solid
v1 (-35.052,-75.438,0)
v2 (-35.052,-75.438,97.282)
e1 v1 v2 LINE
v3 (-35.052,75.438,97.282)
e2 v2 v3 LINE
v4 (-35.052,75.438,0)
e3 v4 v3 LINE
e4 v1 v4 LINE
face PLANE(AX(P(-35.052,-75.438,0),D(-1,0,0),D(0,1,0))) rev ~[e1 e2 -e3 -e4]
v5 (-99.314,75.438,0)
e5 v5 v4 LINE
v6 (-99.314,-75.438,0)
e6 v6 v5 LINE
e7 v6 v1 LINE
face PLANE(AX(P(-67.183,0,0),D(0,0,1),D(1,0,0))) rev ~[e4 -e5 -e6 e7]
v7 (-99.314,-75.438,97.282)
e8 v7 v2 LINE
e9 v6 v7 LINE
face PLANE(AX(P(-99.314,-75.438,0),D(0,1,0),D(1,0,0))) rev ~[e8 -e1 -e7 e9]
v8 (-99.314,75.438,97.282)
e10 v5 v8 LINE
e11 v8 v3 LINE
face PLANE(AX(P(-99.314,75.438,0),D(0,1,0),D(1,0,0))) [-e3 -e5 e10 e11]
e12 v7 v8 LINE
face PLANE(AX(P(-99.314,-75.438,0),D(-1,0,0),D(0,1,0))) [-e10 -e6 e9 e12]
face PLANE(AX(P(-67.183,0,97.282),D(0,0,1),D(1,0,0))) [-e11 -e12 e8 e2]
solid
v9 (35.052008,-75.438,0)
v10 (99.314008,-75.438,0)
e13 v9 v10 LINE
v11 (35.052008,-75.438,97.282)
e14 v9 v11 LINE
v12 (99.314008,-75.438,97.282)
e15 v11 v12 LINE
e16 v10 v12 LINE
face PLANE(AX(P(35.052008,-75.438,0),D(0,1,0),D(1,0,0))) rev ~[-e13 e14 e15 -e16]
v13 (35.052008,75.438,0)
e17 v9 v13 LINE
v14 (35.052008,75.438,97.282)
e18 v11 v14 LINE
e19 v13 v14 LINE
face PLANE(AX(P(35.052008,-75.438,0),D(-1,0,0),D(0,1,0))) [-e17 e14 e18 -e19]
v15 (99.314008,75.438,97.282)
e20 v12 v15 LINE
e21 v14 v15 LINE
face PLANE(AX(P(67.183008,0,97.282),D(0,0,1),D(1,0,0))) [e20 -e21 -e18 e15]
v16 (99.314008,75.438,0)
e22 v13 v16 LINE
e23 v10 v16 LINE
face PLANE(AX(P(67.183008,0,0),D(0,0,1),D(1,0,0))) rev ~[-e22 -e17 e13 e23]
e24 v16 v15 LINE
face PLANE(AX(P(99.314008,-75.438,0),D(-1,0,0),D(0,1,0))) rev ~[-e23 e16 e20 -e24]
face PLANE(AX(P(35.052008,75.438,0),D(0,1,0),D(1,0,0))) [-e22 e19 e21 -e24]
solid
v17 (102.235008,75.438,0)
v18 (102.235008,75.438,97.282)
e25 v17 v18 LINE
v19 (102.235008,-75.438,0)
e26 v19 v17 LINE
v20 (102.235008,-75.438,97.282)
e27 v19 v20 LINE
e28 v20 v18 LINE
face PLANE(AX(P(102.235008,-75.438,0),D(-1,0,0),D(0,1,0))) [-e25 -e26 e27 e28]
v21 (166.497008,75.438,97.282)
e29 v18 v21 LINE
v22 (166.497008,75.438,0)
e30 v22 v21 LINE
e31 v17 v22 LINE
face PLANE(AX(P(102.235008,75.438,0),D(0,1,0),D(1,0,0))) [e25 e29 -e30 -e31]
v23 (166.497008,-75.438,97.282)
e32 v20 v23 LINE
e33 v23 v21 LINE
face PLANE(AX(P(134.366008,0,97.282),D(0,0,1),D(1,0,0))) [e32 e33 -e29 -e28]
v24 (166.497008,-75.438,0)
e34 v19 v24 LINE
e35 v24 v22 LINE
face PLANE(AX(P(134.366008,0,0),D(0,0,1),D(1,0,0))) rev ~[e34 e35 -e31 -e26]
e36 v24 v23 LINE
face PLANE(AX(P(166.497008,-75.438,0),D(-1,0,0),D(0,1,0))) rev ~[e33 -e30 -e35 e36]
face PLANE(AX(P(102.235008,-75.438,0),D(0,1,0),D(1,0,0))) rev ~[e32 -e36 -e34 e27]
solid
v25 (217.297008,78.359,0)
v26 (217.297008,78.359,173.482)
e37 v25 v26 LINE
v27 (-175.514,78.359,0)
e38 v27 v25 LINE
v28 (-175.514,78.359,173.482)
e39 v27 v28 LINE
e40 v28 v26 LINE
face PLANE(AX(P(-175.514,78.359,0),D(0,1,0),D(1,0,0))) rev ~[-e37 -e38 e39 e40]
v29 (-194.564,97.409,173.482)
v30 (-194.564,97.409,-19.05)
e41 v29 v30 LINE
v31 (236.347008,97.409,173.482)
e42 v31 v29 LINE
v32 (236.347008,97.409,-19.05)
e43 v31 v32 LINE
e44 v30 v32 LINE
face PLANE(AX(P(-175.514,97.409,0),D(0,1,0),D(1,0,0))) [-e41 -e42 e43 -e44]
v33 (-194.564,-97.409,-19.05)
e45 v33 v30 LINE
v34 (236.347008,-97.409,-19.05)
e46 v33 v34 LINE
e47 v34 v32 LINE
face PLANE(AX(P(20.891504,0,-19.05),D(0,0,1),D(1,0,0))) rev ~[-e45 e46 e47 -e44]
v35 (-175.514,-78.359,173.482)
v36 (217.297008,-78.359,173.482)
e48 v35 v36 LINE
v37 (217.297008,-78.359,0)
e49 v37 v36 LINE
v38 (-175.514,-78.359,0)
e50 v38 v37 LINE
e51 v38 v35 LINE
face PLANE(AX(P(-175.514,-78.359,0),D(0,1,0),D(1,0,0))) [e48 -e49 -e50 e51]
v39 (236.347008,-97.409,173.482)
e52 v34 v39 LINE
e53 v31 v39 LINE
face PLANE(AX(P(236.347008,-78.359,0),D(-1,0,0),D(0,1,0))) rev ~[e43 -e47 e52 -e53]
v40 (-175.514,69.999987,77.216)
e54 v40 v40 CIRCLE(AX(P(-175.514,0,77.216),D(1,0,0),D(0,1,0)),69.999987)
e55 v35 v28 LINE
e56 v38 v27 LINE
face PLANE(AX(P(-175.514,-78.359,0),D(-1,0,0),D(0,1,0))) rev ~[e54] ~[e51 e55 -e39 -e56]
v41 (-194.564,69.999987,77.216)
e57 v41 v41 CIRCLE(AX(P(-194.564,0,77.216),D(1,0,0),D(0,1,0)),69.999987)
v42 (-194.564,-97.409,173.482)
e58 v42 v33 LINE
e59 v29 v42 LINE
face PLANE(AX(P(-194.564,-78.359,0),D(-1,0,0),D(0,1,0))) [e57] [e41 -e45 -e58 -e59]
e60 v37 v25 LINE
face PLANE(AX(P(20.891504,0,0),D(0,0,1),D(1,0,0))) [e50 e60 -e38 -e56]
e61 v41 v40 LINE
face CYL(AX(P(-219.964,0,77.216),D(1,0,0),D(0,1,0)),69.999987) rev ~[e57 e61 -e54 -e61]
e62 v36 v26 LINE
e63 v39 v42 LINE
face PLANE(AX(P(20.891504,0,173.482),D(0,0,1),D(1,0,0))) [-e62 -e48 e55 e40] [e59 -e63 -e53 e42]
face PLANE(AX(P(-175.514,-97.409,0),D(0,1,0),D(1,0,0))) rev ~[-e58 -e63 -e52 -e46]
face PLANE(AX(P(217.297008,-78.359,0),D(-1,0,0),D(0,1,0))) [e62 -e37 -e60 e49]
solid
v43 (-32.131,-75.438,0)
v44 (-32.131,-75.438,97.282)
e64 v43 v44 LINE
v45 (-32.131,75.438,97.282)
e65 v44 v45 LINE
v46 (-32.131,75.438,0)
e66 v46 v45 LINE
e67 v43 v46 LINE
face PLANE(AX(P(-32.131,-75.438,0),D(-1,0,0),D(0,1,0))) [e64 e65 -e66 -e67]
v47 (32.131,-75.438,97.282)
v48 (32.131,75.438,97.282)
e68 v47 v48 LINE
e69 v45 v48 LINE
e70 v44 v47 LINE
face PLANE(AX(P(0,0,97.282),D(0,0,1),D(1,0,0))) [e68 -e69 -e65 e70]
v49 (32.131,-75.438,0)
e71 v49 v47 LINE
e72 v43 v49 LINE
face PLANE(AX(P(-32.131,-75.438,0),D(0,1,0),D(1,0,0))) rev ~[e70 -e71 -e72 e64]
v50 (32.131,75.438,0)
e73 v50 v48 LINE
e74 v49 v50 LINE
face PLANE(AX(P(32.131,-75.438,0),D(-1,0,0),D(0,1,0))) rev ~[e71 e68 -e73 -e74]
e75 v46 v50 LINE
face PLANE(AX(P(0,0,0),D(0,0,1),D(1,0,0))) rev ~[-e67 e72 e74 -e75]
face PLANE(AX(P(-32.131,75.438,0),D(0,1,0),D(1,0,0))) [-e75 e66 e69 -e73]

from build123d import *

# Parameters (mm, degrees)
F0_W      = 64.262
F0_H      = 150.876
F1_DEPTH  = 97.282
F2_W      = 64.262
F2_H      = 150.876
F3_DEPTH  = 97.282
F4_W      = 64.262
F4_H      = 150.876
F5_DEPTH  = 97.282
F6_W      = 64.262
F6_H      = 150.876
F7_DEPTH  = 97.282
F8_W      = 392.8110076251
F8_H      = 156.718
F9_DEPTH  = 173.482
F10_T     = 19.05
F12_D     = 139.999974
F12_DEPTH = 25.4
F12_TIP   = 42.0602355207


with BuildPart() as f1:
    # F0 (on Top) → F1 (new body)
    with BuildSketch(Plane.XY):
        Rectangle(F0_W, F0_H)
    extrude(amount=F1_DEPTH)


with BuildPart() as f3:
    # F2 (on Top) → F3 (new body)
    with BuildSketch(Plane.XY):
        with Locations((-67.183, 0)):
            Rectangle(F2_W, F2_H)
    extrude(amount=F3_DEPTH)


with BuildPart() as f5:
    # F4 (on Top) → F5 (new body)
    with BuildSketch(Plane.XY):
        with Locations((67.1830076251, 0)):
            Rectangle(F4_W, F4_H)
    extrude(amount=F5_DEPTH)


with BuildPart() as f7:
    # F6 (on Top) → F7 (new body)
    with BuildSketch(Plane.XY):
        with Locations((134.3660076251, 0)):
            Rectangle(F6_W, F6_H)
    extrude(amount=F7_DEPTH)


with BuildPart() as f9:
    # F8 (on Top) → F9 (new body)
    with BuildSketch(Plane.XY):
        with Locations((20.8915038126, 0)):
            Rectangle(F8_W, F8_H)
    extrude(amount=F9_DEPTH)

    # F10
    f10_openings = [f9.faces().sort_by_distance(p)[0] for p in [
        (20.891504, 0, 173.482),
    ]]
    offset(amount=F10_T, openings=f10_openings, kind=Kind.INTERSECTION)

    # F12
    with Locations(Plane(origin=(-194.564, 0, 0), x_dir=(0, -1, 0), z_dir=(-1, 0, 0))):
        with Locations((0, 77.216)):
            Hole(F12_D / 2, depth=F12_DEPTH)
            with Locations((0, 0, -(F12_DEPTH + F12_TIP / 2))):  # 118° drill point
                Cone(0, F12_D / 2, F12_TIP, mode=Mode.SUBTRACT)


solid = Compound([f1.part, f3.part, f5.part, f7.part, f9.part])
